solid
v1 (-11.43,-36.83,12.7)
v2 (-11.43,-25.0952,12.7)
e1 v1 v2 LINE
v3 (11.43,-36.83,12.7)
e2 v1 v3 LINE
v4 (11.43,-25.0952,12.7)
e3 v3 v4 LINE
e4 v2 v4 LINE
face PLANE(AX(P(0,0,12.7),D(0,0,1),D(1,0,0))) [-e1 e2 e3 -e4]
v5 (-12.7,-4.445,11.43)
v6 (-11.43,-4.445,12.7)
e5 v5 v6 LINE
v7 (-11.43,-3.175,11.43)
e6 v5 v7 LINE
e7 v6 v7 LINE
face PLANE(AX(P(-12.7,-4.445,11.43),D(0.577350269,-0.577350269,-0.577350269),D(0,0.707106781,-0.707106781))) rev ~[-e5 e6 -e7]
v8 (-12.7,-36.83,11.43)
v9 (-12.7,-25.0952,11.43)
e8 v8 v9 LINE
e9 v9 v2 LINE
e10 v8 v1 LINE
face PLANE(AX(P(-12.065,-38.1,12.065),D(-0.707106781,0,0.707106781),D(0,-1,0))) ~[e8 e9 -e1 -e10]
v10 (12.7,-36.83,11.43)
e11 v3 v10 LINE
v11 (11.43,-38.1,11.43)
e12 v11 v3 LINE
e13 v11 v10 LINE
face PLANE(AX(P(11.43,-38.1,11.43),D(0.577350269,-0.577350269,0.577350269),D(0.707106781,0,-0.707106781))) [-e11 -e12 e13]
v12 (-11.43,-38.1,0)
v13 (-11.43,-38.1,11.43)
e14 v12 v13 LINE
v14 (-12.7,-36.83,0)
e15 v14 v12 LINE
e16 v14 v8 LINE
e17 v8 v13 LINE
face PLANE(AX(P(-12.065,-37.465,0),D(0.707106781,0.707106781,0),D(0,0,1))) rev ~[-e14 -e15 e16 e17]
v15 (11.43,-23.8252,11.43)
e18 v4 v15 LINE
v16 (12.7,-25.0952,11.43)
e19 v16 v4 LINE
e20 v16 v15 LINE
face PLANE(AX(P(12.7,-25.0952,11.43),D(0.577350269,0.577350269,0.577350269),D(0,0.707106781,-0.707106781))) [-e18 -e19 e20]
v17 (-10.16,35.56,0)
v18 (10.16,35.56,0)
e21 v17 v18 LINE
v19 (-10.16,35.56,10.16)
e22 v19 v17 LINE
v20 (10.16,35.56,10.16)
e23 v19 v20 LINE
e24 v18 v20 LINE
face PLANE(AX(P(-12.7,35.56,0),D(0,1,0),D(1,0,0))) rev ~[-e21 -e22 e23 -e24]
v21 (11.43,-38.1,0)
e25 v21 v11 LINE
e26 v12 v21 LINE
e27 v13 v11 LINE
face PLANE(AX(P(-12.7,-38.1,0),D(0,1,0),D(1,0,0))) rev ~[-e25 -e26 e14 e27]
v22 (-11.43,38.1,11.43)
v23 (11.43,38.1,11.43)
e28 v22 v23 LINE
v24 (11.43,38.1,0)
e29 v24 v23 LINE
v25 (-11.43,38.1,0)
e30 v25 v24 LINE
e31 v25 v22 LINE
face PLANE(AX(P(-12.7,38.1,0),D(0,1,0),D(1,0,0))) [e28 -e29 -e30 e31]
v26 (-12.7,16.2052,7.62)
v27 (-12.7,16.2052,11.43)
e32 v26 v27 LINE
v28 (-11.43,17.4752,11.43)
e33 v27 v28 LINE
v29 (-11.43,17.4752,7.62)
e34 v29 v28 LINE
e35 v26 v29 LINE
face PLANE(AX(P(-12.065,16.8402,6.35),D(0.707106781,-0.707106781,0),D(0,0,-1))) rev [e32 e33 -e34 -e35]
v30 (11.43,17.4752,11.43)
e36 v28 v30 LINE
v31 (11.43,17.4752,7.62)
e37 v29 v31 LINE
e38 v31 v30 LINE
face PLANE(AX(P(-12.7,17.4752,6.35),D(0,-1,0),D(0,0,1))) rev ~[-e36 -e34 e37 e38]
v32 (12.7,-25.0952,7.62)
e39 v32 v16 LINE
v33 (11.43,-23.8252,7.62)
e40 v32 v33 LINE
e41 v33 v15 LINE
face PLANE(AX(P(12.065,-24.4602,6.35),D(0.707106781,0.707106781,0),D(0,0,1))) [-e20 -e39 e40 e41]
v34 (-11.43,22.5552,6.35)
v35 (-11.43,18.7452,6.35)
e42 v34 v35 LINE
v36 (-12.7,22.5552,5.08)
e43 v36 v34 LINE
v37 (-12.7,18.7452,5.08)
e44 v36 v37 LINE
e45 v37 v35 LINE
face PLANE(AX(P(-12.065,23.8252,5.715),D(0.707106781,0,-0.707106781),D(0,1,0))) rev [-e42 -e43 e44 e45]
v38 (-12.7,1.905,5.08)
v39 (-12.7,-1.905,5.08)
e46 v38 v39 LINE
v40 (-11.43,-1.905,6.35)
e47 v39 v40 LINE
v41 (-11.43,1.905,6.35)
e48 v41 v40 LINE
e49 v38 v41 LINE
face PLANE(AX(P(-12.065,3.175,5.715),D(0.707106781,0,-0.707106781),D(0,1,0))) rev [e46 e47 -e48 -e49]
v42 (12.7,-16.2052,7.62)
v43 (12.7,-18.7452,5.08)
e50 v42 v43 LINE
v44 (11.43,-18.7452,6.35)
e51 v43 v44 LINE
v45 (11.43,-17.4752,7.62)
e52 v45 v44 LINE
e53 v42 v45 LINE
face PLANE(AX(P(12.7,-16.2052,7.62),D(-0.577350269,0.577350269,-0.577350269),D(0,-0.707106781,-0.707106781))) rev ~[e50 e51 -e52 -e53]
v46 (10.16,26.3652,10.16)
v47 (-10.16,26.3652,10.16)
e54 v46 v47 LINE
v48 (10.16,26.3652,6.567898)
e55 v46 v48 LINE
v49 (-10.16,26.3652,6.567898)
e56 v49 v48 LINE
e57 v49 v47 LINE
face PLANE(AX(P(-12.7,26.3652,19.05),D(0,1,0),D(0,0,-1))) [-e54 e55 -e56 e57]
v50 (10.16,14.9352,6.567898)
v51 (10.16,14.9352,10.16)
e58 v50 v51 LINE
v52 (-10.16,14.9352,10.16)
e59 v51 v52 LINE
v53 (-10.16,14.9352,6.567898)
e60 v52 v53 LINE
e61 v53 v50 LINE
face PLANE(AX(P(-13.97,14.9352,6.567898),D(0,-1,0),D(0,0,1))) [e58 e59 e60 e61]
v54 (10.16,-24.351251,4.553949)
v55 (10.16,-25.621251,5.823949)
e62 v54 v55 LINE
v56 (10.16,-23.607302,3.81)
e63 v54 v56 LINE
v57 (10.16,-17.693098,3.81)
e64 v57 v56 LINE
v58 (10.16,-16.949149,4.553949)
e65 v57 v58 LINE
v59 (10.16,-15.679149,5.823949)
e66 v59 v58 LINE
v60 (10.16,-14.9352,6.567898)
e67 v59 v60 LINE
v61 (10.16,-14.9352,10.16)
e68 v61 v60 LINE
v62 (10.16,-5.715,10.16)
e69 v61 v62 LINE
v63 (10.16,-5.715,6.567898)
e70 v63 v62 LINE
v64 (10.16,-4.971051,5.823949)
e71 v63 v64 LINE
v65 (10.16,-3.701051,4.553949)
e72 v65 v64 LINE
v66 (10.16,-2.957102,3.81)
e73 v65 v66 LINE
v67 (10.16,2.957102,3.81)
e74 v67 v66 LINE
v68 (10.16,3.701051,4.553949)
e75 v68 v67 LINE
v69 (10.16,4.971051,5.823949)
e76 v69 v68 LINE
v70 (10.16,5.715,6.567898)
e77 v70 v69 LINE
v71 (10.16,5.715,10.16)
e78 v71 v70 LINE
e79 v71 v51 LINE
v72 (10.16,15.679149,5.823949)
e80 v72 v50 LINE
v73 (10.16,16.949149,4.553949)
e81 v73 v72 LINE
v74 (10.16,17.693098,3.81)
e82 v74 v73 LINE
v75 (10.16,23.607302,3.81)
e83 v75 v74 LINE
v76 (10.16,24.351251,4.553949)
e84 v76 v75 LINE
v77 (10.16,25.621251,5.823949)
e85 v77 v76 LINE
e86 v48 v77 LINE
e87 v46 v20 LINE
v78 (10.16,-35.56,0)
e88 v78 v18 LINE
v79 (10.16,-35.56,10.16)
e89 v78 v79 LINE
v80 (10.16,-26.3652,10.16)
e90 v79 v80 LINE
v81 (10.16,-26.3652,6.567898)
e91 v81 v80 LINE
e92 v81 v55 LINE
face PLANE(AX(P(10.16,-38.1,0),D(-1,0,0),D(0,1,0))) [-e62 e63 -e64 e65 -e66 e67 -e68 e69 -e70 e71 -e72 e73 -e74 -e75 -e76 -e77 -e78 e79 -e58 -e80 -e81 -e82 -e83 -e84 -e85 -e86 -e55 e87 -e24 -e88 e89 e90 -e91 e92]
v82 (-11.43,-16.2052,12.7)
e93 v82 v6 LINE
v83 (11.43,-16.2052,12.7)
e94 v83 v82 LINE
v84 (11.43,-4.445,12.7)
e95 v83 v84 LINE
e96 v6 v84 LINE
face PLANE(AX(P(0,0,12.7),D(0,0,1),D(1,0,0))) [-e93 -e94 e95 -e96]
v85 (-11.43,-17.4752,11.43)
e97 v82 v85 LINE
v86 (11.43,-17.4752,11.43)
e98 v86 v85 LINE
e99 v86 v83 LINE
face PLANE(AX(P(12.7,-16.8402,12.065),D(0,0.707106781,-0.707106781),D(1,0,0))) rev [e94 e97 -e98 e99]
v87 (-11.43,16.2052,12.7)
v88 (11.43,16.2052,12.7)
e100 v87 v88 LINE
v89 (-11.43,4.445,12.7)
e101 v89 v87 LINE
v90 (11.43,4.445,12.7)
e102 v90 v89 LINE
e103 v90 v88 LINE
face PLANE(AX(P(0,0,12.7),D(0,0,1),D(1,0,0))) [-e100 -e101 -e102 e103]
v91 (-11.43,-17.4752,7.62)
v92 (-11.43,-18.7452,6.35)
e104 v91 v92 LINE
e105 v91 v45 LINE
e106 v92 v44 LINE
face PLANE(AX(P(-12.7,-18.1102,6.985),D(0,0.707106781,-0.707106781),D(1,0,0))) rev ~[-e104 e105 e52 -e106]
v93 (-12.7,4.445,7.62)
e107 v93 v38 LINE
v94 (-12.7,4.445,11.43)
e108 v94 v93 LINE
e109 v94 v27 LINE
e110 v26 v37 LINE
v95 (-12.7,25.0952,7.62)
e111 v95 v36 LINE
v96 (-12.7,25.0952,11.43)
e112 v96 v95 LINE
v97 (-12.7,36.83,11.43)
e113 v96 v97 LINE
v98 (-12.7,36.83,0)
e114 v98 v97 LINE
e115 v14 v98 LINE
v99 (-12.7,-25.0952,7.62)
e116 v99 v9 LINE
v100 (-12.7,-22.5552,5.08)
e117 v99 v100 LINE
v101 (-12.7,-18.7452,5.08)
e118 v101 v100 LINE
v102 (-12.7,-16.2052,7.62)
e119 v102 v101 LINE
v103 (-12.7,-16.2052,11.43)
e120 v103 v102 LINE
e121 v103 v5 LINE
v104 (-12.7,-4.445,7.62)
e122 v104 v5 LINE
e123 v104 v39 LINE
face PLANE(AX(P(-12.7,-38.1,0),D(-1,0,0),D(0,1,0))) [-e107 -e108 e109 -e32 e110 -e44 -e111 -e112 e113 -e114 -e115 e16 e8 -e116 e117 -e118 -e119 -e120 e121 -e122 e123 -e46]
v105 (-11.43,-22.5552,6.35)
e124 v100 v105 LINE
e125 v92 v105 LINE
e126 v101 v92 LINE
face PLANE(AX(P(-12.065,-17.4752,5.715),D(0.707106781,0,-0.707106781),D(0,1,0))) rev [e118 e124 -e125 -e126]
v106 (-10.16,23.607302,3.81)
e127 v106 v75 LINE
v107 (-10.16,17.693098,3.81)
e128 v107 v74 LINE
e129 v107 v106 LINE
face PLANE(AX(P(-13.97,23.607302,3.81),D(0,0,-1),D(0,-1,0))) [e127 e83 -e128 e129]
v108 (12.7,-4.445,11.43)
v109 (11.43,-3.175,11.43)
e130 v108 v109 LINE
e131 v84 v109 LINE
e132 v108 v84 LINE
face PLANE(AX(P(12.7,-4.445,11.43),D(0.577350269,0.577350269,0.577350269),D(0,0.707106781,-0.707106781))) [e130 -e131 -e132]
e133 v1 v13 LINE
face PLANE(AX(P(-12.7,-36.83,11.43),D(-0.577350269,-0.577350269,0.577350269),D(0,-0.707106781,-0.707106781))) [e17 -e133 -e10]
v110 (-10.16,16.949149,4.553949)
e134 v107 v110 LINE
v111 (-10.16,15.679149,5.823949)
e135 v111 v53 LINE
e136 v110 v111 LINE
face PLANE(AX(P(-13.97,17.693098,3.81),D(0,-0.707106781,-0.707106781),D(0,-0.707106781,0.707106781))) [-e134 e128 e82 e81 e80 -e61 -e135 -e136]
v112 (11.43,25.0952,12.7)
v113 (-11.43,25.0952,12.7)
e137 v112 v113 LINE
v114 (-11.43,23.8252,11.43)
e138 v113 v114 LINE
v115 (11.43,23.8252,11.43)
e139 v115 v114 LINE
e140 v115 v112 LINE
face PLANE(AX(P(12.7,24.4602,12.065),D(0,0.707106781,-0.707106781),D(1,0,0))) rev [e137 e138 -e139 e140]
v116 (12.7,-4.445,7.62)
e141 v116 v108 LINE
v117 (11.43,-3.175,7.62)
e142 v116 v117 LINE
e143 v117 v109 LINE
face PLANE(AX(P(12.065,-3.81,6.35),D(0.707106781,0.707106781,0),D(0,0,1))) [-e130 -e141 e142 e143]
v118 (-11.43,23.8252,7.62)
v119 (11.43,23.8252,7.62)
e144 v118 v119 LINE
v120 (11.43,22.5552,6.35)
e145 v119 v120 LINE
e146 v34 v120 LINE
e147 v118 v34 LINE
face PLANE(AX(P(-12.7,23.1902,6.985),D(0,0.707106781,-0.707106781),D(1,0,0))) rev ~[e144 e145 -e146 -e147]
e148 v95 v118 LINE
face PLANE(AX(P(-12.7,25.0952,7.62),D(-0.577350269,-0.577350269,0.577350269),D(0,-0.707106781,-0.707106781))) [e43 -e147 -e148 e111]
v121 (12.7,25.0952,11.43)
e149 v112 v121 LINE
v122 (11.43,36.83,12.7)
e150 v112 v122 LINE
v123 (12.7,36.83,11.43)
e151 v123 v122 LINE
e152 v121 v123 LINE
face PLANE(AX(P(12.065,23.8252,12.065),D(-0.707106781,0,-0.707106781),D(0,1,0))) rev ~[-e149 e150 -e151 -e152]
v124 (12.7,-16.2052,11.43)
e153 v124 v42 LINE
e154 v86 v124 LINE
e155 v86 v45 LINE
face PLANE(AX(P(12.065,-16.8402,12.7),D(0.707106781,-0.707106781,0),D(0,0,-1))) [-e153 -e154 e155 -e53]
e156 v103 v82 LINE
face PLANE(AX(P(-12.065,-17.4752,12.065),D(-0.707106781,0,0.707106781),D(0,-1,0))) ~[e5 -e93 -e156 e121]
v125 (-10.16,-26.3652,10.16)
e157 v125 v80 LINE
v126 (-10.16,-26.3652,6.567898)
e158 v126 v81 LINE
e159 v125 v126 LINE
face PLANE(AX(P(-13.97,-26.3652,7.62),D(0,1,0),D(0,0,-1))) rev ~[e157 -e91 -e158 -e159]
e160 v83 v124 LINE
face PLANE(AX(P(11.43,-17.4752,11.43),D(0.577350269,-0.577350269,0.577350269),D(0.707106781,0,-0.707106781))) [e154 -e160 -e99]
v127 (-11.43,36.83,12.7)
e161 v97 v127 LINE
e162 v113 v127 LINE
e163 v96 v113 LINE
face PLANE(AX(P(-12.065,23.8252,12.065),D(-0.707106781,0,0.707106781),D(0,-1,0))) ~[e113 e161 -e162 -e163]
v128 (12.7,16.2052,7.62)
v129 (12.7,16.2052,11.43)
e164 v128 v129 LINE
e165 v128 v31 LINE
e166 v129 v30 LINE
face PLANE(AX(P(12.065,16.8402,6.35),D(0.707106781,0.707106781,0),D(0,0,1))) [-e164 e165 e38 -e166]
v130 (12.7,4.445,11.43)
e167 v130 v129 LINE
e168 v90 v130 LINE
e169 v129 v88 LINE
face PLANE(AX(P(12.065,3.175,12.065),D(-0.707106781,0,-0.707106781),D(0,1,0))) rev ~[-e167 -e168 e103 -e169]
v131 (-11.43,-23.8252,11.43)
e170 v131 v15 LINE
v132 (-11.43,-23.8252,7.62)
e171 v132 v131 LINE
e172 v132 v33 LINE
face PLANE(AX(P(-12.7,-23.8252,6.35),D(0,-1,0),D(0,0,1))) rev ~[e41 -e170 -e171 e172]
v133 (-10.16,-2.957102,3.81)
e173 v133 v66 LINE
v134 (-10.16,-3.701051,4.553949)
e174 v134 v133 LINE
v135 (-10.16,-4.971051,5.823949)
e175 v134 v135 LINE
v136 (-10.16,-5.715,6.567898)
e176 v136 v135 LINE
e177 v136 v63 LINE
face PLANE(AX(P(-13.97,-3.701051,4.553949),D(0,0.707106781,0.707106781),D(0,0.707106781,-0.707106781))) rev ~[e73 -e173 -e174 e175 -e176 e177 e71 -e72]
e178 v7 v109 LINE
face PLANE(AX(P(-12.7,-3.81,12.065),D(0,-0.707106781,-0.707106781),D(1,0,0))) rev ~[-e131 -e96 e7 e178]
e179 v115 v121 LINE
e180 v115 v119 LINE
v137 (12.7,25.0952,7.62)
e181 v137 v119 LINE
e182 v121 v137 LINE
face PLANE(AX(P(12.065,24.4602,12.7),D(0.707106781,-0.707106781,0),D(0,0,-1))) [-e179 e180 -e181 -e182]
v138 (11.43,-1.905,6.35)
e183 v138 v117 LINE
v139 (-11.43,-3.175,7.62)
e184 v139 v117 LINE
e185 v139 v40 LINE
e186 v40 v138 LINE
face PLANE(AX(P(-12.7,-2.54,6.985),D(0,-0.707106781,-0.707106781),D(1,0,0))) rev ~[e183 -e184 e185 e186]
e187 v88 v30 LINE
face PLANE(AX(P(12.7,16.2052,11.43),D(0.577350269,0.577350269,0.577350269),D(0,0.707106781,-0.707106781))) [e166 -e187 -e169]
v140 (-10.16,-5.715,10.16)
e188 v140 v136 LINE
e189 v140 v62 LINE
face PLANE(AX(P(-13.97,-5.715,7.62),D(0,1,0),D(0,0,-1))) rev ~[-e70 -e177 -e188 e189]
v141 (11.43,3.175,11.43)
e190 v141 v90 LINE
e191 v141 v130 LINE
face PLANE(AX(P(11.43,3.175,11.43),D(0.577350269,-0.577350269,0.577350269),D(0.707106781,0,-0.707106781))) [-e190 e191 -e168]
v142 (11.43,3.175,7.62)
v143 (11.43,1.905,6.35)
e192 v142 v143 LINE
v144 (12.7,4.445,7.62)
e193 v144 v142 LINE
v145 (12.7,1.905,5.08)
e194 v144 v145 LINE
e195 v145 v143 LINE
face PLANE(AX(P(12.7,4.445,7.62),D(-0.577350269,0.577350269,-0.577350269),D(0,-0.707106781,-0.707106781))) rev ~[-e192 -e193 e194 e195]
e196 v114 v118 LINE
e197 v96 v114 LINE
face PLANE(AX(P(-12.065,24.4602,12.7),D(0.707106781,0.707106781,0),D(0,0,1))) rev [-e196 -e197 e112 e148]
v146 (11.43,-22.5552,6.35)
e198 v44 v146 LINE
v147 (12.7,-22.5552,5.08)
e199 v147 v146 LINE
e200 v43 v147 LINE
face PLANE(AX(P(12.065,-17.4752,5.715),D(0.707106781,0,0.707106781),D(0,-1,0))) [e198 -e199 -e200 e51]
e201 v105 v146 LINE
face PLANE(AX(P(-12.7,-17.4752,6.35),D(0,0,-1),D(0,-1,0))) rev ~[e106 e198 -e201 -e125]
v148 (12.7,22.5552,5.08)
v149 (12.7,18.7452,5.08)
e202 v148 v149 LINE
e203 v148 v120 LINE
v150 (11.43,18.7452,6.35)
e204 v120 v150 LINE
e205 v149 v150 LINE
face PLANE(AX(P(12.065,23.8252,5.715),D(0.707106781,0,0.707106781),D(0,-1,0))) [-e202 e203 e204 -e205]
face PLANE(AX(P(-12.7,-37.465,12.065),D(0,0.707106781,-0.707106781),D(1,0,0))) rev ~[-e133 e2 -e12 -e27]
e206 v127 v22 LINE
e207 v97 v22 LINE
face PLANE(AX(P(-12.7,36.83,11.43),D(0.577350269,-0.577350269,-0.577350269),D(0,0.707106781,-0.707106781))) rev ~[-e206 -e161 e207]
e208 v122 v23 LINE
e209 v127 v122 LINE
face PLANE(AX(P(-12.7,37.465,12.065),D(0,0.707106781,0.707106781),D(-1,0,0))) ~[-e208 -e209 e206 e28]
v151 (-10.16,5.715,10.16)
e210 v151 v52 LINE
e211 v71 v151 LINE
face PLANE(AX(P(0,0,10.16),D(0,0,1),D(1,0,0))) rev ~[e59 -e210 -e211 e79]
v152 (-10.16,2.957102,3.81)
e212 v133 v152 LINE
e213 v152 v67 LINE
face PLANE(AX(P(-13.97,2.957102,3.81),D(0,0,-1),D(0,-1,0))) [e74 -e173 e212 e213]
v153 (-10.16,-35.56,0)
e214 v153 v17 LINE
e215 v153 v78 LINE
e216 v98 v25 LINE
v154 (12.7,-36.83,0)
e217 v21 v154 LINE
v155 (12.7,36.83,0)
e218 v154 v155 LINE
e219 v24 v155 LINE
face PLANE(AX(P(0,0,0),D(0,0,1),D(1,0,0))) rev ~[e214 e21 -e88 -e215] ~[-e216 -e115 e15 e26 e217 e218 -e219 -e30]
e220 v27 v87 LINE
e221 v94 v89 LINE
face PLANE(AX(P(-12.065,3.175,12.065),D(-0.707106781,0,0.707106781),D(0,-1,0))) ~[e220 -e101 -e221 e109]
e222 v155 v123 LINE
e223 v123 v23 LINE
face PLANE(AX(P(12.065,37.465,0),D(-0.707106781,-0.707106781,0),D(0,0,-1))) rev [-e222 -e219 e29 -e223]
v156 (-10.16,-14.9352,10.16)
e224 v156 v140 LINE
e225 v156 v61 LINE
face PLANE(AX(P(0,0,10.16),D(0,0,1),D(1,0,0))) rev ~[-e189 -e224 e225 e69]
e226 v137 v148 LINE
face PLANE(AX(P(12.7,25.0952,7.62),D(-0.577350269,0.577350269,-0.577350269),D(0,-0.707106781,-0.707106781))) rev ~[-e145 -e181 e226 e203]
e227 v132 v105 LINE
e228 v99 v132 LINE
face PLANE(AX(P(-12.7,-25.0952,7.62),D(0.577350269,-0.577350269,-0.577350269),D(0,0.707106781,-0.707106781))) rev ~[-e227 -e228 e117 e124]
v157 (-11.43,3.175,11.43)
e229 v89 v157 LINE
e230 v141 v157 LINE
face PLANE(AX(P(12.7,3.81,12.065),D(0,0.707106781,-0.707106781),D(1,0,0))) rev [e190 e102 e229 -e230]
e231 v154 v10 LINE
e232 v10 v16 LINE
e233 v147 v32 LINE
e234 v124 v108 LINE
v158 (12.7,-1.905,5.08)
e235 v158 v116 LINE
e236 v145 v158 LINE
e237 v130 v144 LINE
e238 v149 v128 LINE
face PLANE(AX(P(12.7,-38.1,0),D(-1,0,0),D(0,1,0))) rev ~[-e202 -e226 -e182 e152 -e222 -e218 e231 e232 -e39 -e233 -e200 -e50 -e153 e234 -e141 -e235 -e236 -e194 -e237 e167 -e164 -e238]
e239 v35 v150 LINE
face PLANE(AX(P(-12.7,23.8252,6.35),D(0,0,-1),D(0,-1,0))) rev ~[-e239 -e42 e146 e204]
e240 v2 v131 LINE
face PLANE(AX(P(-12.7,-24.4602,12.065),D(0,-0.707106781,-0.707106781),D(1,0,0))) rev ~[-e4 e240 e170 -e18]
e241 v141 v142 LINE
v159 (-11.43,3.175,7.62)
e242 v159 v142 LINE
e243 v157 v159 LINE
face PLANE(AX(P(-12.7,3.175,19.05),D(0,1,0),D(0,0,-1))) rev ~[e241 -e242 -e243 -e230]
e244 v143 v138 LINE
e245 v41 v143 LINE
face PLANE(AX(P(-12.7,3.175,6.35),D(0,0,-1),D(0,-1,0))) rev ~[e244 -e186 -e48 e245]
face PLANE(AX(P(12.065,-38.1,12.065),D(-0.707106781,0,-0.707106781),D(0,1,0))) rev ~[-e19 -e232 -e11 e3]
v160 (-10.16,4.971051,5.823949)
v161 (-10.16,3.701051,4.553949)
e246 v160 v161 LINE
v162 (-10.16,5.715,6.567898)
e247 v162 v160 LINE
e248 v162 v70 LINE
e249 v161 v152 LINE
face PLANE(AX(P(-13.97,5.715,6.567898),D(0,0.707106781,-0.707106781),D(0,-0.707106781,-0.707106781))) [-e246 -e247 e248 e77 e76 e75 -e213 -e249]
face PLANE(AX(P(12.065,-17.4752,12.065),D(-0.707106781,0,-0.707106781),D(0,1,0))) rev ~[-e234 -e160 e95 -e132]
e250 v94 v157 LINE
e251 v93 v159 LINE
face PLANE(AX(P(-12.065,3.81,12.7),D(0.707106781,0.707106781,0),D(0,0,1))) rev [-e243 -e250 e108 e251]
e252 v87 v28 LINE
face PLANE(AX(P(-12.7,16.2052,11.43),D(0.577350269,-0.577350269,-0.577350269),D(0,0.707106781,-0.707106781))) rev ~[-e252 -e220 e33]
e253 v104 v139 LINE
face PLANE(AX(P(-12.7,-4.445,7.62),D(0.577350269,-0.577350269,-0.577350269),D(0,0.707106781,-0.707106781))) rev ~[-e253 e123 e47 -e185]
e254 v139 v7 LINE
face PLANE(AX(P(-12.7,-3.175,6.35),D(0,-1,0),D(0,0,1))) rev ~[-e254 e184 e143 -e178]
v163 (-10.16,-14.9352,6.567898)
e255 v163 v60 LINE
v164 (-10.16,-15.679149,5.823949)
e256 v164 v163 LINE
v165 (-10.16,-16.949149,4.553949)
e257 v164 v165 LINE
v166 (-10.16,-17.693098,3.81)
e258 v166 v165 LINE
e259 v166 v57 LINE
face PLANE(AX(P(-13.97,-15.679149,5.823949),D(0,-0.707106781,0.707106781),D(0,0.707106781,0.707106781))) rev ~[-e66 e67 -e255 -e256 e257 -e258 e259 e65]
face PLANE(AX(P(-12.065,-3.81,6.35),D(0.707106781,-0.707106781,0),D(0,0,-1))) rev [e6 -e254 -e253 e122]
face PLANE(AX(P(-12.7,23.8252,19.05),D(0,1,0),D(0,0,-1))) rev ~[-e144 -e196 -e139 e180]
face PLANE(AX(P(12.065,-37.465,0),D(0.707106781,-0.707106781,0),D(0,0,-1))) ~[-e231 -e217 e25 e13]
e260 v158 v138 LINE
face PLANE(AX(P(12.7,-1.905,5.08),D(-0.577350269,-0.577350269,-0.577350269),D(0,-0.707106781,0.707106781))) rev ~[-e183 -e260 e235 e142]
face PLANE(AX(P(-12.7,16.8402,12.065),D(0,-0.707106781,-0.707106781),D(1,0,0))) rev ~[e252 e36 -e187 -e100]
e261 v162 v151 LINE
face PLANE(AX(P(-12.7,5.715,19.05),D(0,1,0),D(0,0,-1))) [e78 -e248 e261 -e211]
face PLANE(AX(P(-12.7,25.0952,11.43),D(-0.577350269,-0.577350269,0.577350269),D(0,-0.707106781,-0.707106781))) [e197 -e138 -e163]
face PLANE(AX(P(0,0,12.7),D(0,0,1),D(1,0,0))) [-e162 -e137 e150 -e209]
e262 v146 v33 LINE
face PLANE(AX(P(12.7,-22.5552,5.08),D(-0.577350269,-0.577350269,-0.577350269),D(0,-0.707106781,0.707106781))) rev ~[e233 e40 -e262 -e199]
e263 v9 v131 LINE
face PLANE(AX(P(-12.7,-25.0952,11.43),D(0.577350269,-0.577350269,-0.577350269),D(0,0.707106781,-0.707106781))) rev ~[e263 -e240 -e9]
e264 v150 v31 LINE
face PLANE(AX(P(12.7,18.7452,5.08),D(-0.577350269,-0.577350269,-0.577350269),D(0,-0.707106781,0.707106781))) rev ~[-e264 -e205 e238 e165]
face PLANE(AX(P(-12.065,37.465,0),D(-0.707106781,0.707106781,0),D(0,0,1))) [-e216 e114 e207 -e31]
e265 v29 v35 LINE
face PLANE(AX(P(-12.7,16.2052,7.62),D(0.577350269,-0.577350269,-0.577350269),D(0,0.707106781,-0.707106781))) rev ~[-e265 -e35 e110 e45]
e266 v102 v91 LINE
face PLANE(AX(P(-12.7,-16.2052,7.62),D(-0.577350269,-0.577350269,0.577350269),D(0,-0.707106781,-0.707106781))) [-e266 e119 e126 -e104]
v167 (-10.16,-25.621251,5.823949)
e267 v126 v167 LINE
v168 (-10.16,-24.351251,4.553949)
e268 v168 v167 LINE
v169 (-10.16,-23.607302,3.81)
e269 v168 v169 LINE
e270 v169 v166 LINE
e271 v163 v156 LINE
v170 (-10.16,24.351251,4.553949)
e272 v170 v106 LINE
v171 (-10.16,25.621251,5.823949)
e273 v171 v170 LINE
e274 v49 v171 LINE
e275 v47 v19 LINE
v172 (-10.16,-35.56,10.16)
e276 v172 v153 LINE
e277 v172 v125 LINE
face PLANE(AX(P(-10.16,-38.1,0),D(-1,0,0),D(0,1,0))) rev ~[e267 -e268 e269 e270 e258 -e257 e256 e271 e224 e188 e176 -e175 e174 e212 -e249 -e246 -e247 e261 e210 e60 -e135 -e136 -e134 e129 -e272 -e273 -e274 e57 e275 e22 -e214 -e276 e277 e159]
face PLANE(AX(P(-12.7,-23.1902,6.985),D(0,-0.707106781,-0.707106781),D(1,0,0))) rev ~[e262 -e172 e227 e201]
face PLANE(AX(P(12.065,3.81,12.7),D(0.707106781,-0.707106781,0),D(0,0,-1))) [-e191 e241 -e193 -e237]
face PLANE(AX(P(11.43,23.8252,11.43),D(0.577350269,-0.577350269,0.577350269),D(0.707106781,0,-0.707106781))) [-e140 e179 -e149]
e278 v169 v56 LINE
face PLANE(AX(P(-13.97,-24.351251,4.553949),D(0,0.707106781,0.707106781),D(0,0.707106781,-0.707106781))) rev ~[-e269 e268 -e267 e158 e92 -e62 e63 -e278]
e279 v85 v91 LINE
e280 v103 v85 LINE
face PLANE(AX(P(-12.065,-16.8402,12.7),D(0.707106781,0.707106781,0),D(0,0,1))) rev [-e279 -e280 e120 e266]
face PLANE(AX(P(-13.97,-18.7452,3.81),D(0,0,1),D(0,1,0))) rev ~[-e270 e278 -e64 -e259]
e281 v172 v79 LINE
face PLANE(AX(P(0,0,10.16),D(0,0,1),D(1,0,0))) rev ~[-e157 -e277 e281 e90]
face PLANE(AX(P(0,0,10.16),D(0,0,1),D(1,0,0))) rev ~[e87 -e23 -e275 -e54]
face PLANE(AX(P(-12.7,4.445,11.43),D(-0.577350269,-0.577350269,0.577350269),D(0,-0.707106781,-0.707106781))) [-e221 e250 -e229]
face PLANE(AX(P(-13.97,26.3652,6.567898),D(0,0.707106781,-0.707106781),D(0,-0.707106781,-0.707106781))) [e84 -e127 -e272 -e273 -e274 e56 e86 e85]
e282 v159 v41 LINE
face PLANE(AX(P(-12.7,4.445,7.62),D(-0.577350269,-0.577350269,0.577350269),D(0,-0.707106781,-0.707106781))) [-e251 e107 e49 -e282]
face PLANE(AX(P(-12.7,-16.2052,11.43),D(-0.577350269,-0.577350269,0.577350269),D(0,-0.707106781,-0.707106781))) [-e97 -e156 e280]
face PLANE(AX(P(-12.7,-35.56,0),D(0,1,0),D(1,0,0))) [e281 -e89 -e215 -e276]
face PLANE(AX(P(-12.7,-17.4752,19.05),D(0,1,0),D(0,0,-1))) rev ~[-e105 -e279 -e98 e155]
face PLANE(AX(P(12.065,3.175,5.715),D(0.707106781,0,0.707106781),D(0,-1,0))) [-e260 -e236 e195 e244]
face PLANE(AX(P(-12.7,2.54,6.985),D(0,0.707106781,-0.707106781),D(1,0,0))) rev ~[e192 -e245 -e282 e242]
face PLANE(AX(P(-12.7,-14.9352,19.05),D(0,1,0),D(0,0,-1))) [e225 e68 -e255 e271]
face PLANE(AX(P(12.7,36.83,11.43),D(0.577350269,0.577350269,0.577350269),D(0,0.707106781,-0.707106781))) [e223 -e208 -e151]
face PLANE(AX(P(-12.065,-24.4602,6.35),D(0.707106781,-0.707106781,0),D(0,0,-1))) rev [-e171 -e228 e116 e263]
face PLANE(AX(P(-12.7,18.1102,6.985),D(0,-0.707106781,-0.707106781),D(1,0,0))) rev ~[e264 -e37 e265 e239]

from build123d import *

# Parameters (mm, degrees)
F0_W         = 25.4
F0_H         = 76.2
F1_DEPTH     = 12.7
F2_W         = 6.35
F2_H         = 6.35
F2_H_2       = 12.7
F3_DEPTH     = 25.401
F4_SIZE      = 1.27
F5_T         = 2.54
F5_T3_DEPTH  = 6.8760512242
F5_T5_DEPTH  = 6.8760512242
F5_T7_DEPTH  = 6.8760512242
F5_T9_DEPTH  = 6.8760512242
F5_T11_DEPTH = 6.8760512242
F5_T13_DEPTH = 6.8760512242
F5_T15_DEPTH = 6.8760512242
F5_T17_DEPTH = 27.94
F5_T19_DEPTH = 6.8760512242
F5_T21_DEPTH = 6.8760512242
F5_T23_DEPTH = 6.8760512242
F5_T25_DEPTH = 6.8760512242
F5_T27_DEPTH = 6.8760512242
F5_T29_DEPTH = 6.8760512242
F5_T31_DEPTH = 6.8760512242


# Not quite as in the source:
# - a shell that OpenCascade refuses in one call is made with other operations: the cavity is built on its own and cut out


with BuildPart() as f1:
    # F0 (on Top) → F1 (new body)
    with BuildSketch(Plane.XY):
        Rectangle(F0_W, F0_H)
    extrude(amount=F1_DEPTH)

    # F2 (on face) → F3 (cut, through all)
    with BuildSketch(Plane(origin=(-12.7, 0, 0), x_dir=(0, -1, 0), z_dir=(-1, 0, 0))):
        with Locations((-20.6502, 9.525)):
            Rectangle(F2_W, F2_H)
        with Locations((-20.6502, 15.875)):
            Rectangle(F2_W, F2_H)
        with Locations((0, 15.875)):
            Rectangle(F2_W, F2_H)
        with Locations((0, 9.525)):
            Rectangle(F2_W, F2_H)
        with Locations((20.6502, 9.525)):
            Rectangle(F2_W, F2_H)
        with Locations((20.6502, 15.875)):
            Rectangle(F2_W, F2_H)
        with Locations((0, 12.7)):
            Rectangle(F2_W, F2_H_2)
        with Locations((20.6502, 12.7)):
            Rectangle(F2_W, F2_H_2)
        with Locations((-20.6502, 12.7)):
            Rectangle(F2_W, F2_H_2)
    extrude(amount=-F3_DEPTH, mode=Mode.SUBTRACT)

    # F4
    f4_edges = [f1.edges().sort_by_distance(p)[0] for p in [
        (0, -3.175, 12.7),
        (12.7, -10.3251, 12.7),
        (0, -17.4752, 12.7),
        (-12.7, -10.3251, 12.7),
        (0, 38.1, 12.7),
        (12.7, 30.9626, 12.7),
        (0, 23.8252, 12.7),
        (-12.7, 30.9626, 12.7),
        (-12.7, 0, 6.35),
        (0, -3.175, 6.35),
        (12.7, 0, 6.35),
        (0, 3.175, 6.35),
        (-12.7, -20.6502, 6.35),
        (0, -23.8252, 6.35),
        (12.7, -20.6502, 6.35),
        (0, -17.4752, 6.35),
        (-12.7, 20.6502, 6.35),
        (0, 17.4752, 6.35),
        (12.7, 20.6502, 6.35),
        (0, 23.8252, 6.35),
        (0, 17.4752, 12.7),
        (12.7, 10.3251, 12.7),
        (0, 3.175, 12.7),
        (-12.7, 10.3251, 12.7),
        (0, -23.8252, 12.7),
        (12.7, -30.9626, 12.7),
        (0, -38.1, 12.7),
        (-12.7, -30.9626, 12.7),
        (-12.7, 38.1, 6.35),
        (12.7, 38.1, 6.35),
        (-12.7, -38.1, 6.35),
        (12.7, -38.1, 6.35),
        (-12.7, -23.8252, 9.525),
        (-12.7, -17.4752, 9.525),
        (-12.7, -3.175, 9.525),
        (-12.7, 3.175, 9.525),
        (-12.7, 17.4752, 9.525),
        (-12.7, 23.8252, 9.525),
        (12.7, -23.8252, 9.525),
        (12.7, -17.4752, 9.525),
        (12.7, -3.175, 9.525),
        (12.7, 3.175, 9.525),
        (12.7, 17.4752, 9.525),
        (12.7, 23.8252, 9.525),
    ]]
    chamfer(f4_edges, length=F4_SIZE)

    # F5: shell of thickness 2.54, made by hand


with BuildPart() as f5_core1:
    # F5_t2: copy of F1
    add(f1.part)

    # the walls: a layer under each face that stays
    f5_faces = [f5_core1.faces().sort_by_distance(p)[0] for p in [
        (-12.7, 24.5533333333, 5.715),
        (-12.065, 37.465, 5.715),
        (-12.065, -37.465, 5.715),
        (-12.065, 30.9626, 12.065),
        (-12.065, -30.9626, 12.065),
        (-12.065, 24.4602, 9.525),
        (-12.065, -24.4602, 9.525),
        (-12.065, 23.5077, 6.6675),
        (-12.065, -23.5077, 6.6675),
        (-12.065, 20.6502, 5.715),
        (-12.065, -20.6502, 5.715),
        (-12.065, 17.7927, 6.6675),
        (-12.065, -17.7927, 6.6675),
        (-12.065, 16.8402, 9.525),
        (-12.065, -16.8402, 9.525),
        (-12.065, 10.3251, 12.065),
        (-12.065, -10.3251, 12.065),
        (-12.065, 3.81, 9.525),
        (-12.065, -3.81, 9.525),
        (-12.065, 2.8575, 6.6675),
        (-12.065, -2.8575, 6.6675),
        (-12.065, 0, 5.715),
        (0, 38.1, 5.715),
        (0, -38.1, 5.715),
        (12.065, 37.465, 5.715),
        (12.065, -37.465, 5.715),
        (12.7, -24.5533333333, 5.715),
        (-12.065, 37.1475, 11.7475),
        (-12.065, -37.1475, 11.7475),
        (0, 30.9626, 12.7),
        (-12.065, 24.7777, 11.7475),
        (-12.065, -24.7777, 11.7475),
        (0, -30.9626, 12.7),
        (0, 23.8252, 9.525),
        (0, -23.8252, 9.525),
        (0, 23.1902, 6.985),
        (0, -23.1902, 6.985),
        (0, 20.6502, 6.35),
        (0, -20.6502, 6.35),
        (0, 18.1102, 6.985),
        (0, -18.1102, 6.985),
        (0, 17.4752, 9.525),
        (-12.065, 16.5227, 11.7475),
        (-12.065, -16.5227, 11.7475),
        (0, -17.4752, 9.525),
        (0, 10.3251, 12.7),
        (-12.065, 4.1275, 11.7475),
        (-12.065, -4.1275, 11.7475),
        (0, -10.3251, 12.7),
        (0, 3.175, 9.525),
        (0, -3.175, 9.525),
        (0, 2.54, 6.985),
        (0, -2.54, 6.985),
        (0, 0, 6.35),
        (0, 37.465, 12.065),
        (0, -37.465, 12.065),
        (12.065, 37.1475, 11.7475),
        (11.7475, -37.465, 11.7475),
        (12.065, -30.9626, 12.065),
        (12.065, 30.9626, 12.065),
        (12.065, -24.4602, 9.525),
        (12.065, 24.4602, 9.525),
        (12.065, -23.5077, 6.6675),
        (12.065, 23.5077, 6.6675),
        (12.065, -20.6502, 5.715),
        (12.065, 20.6502, 5.715),
        (12.065, -17.7927, 6.6675),
        (12.065, 17.7927, 6.6675),
        (12.065, -16.8402, 9.525),
        (12.065, 16.8402, 9.525),
        (12.065, -10.3251, 12.065),
        (12.065, 10.3251, 12.065),
        (12.065, -3.81, 9.525),
        (12.065, 3.81, 9.525),
        (12.065, -2.8575, 6.6675),
        (12.065, 2.8575, 6.6675),
        (12.065, 0, 5.715),
        (0, 24.4602, 12.065),
        (0, -24.4602, 12.065),
        (0, 16.8402, 12.065),
        (0, -16.8402, 12.065),
        (0, 3.81, 12.065),
        (0, -3.81, 12.065),
        (12.065, -24.7777, 11.7475),
        (11.7475, 24.4602, 11.7475),
        (11.7475, -16.8402, 11.7475),
        (12.065, 16.5227, 11.7475),
        (12.065, -4.1275, 11.7475),
        (11.7475, 3.81, 11.7475),
    ]]
    thicken(f5_faces, amount=-F5_T, mode=Mode.SUBTRACT)

    # F5_s4 → F5_t3 (cut)
    with BuildSketch(Plane(origin=(-20.6936512242, 20.6936512242, 0), x_dir=(0, 0, 1), z_dir=(0.7071067812, -0.7071067812, 0))):
        Polygon((7.6346646968, -8.718590961), (7.62, -11.3047299742), (6.8126933972, -11.3047299742), (6.1535303163, -10.8386312897), align=None)
    extrude(amount=F5_T3_DEPTH, mode=Mode.SUBTRACT)

    # F5_s6 → F5_t5 (cut)
    with BuildSketch(Plane(origin=(-20.6936512242, -20.6936512242, 0), x_dir=(0, 0, 1), z_dir=(0.7071067812, 0.7071067812, 0))):
        Polygon((7.6346646968, 8.718590961), (7.62, 11.3047299742), (6.8126933972, 11.3047299742), (6.1535303163, 10.8386312897), align=None)
    extrude(amount=F5_T5_DEPTH, mode=Mode.SUBTRACT)

    # F5_s8 → F5_t7 (cut)
    with BuildSketch(Plane(origin=(-5.6060512242, 0, -5.6060512242), x_dir=(0, 1, 0), z_dir=(0.7071067812, 0, 0.7071067812))):
        Polygon((22.5405353032, 12.6184975827), (24.0216696837, 10.4984572539), (23.3625066028, 10.0323585695), (22.5552, 10.0323585695), align=None)
        Polygon((-22.5405353032, 12.6184975827), (-24.0216696837, 10.4984572539), (-23.3625066028, 10.0323585695), (-22.5552, 10.0323585695), align=None)
        Polygon((18.7598646968, 12.6184975827), (18.7452, 10.0323585695), (17.9378933972, 10.0323585695), (17.2787303163, 10.4984572539), align=None)
        Polygon((-18.7598646968, 12.6184975827), (-18.7452, 10.0323585695), (-17.9378933972, 10.0323585695), (-17.2787303163, 10.4984572539), align=None)
        Polygon((1.8903353032, 12.6184975827), (3.3714696837, 10.4984572539), (2.7123066028, 10.0323585695), (1.905, 10.0323585695), align=None)
        Polygon((-1.8903353032, 12.6184975827), (-3.3714696837, 10.4984572539), (-2.7123066028, 10.0323585695), (-1.905, 10.0323585695), align=None)
    extrude(amount=F5_T7_DEPTH, mode=Mode.SUBTRACT)

    # F5_s10 → F5_t9 (cut)
    with BuildSketch(Plane(origin=(-0.0434512242, -0.0434512242, 0), x_dir=(0, 0, 1), z_dir=(0.7071067812, 0.7071067812, 0))):
        Polygon((7.6346646968, -20.4852019447), (6.1535303163, -18.365161616), (6.8126933972, -17.8990629316), (7.62, -17.8990629316), align=None)
    extrude(amount=F5_T9_DEPTH, mode=Mode.SUBTRACT)

    # F5_s12 → F5_t11 (cut)
    with BuildSketch(Plane(origin=(-0.0434512242, 0.0434512242, 0), x_dir=(0, 0, 1), z_dir=(0.7071067812, -0.7071067812, 0))):
        Polygon((7.6346646968, 20.4852019447), (6.1535303163, 18.365161616), (6.8126933972, 17.8990629316), (7.62, 17.8990629316), align=None)
    extrude(amount=F5_T11_DEPTH, mode=Mode.SUBTRACT)

    # F5_s14 → F5_t13 (cut)
    with BuildSketch(Plane(origin=(-10.3685512242, 10.3685512242, 0), x_dir=(0, 0, 1), z_dir=(0.7071067812, -0.7071067812, 0))):
        Polygon((7.6346646968, 5.8833054919), (7.62, 3.2971664787), (6.8126933972, 3.2971664787), (6.1535303163, 3.7632651631), align=None)
    extrude(amount=F5_T13_DEPTH, mode=Mode.SUBTRACT)

    # F5_s16 → F5_t15 (cut)
    with BuildSketch(Plane(origin=(-10.3685512242, -10.3685512242, 0), x_dir=(0, 0, 1), z_dir=(0.7071067812, 0.7071067812, 0))):
        Polygon((7.6346646968, -5.8833054919), (7.62, -3.2971664787), (6.8126933972, -3.2971664787), (6.1535303163, -3.7632651631), align=None)
    extrude(amount=F5_T15_DEPTH, mode=Mode.SUBTRACT)

    # F5_s18 → F5_t17 (cut)
    with BuildSketch(Plane.YZ.offset(-13.97)):
        Polygon((23.7818394878, 7.6379605122), (26.3652, 7.62), (26.3652, 6.5678975516), (25.6212512242, 5.8239487758), align=None)
        Polygon((-23.7818394878, 7.6379605122), (-26.3652, 7.62), (-26.3652, 6.5678975516), (-25.6212512242, 5.8239487758), align=None)
        Polygon((22.5372394878, 6.3933605122), (24.3512512242, 4.5539487758), (23.6073024484, 3.81), (22.5552, 3.81), align=None)
        Polygon((-22.5372394878, 6.3933605122), (-24.3512512242, 4.5539487758), (-23.6073024484, 3.81), (-22.5552, 3.81), align=None)
        Polygon((18.7631605122, 6.3933605122), (18.7452, 3.81), (17.6930975516, 3.81), (16.9491487758, 4.5539487758), align=None)
        Polygon((-18.7631605122, 6.3933605122), (-18.7452, 3.81), (-17.6930975516, 3.81), (-16.9491487758, 4.5539487758), align=None)
        Polygon((17.5185605122, 7.6379605122), (15.6791487758, 5.8239487758), (14.9352, 6.5678975516), (14.9352, 7.62), align=None)
        Polygon((-17.5185605122, 7.6379605122), (-15.6791487758, 5.8239487758), (-14.9352, 6.5678975516), (-14.9352, 7.62), align=None)
        Polygon((3.1316394878, 7.6379605122), (5.715, 7.62), (5.715, 6.5678975516), (4.9710512242, 5.8239487758), align=None)
        Polygon((-3.1316394878, 7.6379605122), (-5.715, 7.62), (-5.715, 6.5678975516), (-4.9710512242, 5.8239487758), align=None)
        Polygon((1.8870394878, 6.3933605122), (3.7010512242, 4.5539487758), (2.9571024484, 3.81), (1.905, 3.81), align=None)
        Polygon((-1.8870394878, 6.3933605122), (-3.7010512242, 4.5539487758), (-2.9571024484, 3.81), (-1.905, 3.81), align=None)
    extrude(amount=F5_T17_DEPTH, mode=Mode.SUBTRACT)

    # F5_s20 → F5_t19 (cut)
    with BuildSketch(Plane(origin=(20.6936512242, -20.6936512242, 0), x_dir=(0, 0, 1), z_dir=(-0.7071067812, 0.7071067812, 0))):
        Polygon((7.6346646968, -8.718590961), (7.62, -11.3047299742), (6.8126933972, -11.3047299742), (6.1535303163, -10.8386312897), align=None)
    extrude(amount=F5_T19_DEPTH, mode=Mode.SUBTRACT)

    # F5_s22 → F5_t21 (cut)
    with BuildSketch(Plane(origin=(20.6936512242, 20.6936512242, 0), x_dir=(0, 0, 1), z_dir=(-0.7071067812, -0.7071067812, 0))):
        Polygon((7.6346646968, 8.718590961), (7.62, 11.3047299742), (6.8126933972, 11.3047299742), (6.1535303163, 10.8386312897), align=None)
    extrude(amount=F5_T21_DEPTH, mode=Mode.SUBTRACT)

    # F5_s24 → F5_t23 (cut)
    with BuildSketch(Plane(origin=(5.6060512242, 0, -5.6060512242), x_dir=(0, 1, 0), z_dir=(-0.7071067812, 0, 0.7071067812))):
        Polygon((-22.5405353032, -12.6184975827), (-24.0216696837, -10.4984572539), (-23.3625066028, -10.0323585695), (-22.5552, -10.0323585695), align=None)
        Polygon((22.5405353032, -12.6184975827), (24.0216696837, -10.4984572539), (23.3625066028, -10.0323585695), (22.5552, -10.0323585695), align=None)
        Polygon((-18.7598646968, -12.6184975827), (-18.7452, -10.0323585695), (-17.9378933972, -10.0323585695), (-17.2787303163, -10.4984572539), align=None)
        Polygon((18.7598646968, -12.6184975827), (18.7452, -10.0323585695), (17.9378933972, -10.0323585695), (17.2787303163, -10.4984572539), align=None)
        Polygon((-1.8903353032, -12.6184975827), (-3.3714696837, -10.4984572539), (-2.7123066028, -10.0323585695), (-1.905, -10.0323585695), align=None)
        Polygon((1.8903353032, -12.6184975827), (3.3714696837, -10.4984572539), (2.7123066028, -10.0323585695), (1.905, -10.0323585695), align=None)
    extrude(amount=F5_T23_DEPTH, mode=Mode.SUBTRACT)

    # F5_s26 → F5_t25 (cut)
    with BuildSketch(Plane(origin=(0.0434512242, 0.0434512242, 0), x_dir=(0, 0, 1), z_dir=(-0.7071067812, -0.7071067812, 0))):
        Polygon((7.6346646968, -20.4852019447), (6.1535303163, -18.365161616), (6.8126933972, -17.8990629316), (7.62, -17.8990629316), align=None)
    extrude(amount=F5_T25_DEPTH, mode=Mode.SUBTRACT)

    # F5_s28 → F5_t27 (cut)
    with BuildSketch(Plane(origin=(0.0434512242, -0.0434512242, 0), x_dir=(0, 0, 1), z_dir=(-0.7071067812, 0.7071067812, 0))):
        Polygon((7.6346646968, 20.4852019447), (6.1535303163, 18.365161616), (6.8126933972, 17.8990629316), (7.62, 17.8990629316), align=None)
    extrude(amount=F5_T27_DEPTH, mode=Mode.SUBTRACT)

    # F5_s30 → F5_t29 (cut)
    with BuildSketch(Plane(origin=(10.3685512242, -10.3685512242, 0), x_dir=(0, 0, 1), z_dir=(-0.7071067812, 0.7071067812, 0))):
        Polygon((7.6346646968, 5.8833054919), (7.62, 3.2971664787), (6.8126933972, 3.2971664787), (6.1535303163, 3.7632651631), align=None)
    extrude(amount=F5_T29_DEPTH, mode=Mode.SUBTRACT)

    # F5_s32 → F5_t31 (cut)
    with BuildSketch(Plane(origin=(10.3685512242, 10.3685512242, 0), x_dir=(0, 0, 1), z_dir=(-0.7071067812, -0.7071067812, 0))):
        Polygon((7.6346646968, -5.8833054919), (7.62, -3.2971664787), (6.8126933972, -3.2971664787), (6.1535303163, -3.7632651631), align=None)
    extrude(amount=F5_T31_DEPTH, mode=Mode.SUBTRACT)


with BuildPart() as f1_1:
    add(f1.part)

    # what is left inside the walls is the cavity
    f5_cavity = [f5_core1.part.solids().sort_by_distance(p)[0] for p in [
        (0, -11.853333, 0.0254),
    ]]
    add(f5_cavity, mode=Mode.SUBTRACT)


solid = f1_1.part
